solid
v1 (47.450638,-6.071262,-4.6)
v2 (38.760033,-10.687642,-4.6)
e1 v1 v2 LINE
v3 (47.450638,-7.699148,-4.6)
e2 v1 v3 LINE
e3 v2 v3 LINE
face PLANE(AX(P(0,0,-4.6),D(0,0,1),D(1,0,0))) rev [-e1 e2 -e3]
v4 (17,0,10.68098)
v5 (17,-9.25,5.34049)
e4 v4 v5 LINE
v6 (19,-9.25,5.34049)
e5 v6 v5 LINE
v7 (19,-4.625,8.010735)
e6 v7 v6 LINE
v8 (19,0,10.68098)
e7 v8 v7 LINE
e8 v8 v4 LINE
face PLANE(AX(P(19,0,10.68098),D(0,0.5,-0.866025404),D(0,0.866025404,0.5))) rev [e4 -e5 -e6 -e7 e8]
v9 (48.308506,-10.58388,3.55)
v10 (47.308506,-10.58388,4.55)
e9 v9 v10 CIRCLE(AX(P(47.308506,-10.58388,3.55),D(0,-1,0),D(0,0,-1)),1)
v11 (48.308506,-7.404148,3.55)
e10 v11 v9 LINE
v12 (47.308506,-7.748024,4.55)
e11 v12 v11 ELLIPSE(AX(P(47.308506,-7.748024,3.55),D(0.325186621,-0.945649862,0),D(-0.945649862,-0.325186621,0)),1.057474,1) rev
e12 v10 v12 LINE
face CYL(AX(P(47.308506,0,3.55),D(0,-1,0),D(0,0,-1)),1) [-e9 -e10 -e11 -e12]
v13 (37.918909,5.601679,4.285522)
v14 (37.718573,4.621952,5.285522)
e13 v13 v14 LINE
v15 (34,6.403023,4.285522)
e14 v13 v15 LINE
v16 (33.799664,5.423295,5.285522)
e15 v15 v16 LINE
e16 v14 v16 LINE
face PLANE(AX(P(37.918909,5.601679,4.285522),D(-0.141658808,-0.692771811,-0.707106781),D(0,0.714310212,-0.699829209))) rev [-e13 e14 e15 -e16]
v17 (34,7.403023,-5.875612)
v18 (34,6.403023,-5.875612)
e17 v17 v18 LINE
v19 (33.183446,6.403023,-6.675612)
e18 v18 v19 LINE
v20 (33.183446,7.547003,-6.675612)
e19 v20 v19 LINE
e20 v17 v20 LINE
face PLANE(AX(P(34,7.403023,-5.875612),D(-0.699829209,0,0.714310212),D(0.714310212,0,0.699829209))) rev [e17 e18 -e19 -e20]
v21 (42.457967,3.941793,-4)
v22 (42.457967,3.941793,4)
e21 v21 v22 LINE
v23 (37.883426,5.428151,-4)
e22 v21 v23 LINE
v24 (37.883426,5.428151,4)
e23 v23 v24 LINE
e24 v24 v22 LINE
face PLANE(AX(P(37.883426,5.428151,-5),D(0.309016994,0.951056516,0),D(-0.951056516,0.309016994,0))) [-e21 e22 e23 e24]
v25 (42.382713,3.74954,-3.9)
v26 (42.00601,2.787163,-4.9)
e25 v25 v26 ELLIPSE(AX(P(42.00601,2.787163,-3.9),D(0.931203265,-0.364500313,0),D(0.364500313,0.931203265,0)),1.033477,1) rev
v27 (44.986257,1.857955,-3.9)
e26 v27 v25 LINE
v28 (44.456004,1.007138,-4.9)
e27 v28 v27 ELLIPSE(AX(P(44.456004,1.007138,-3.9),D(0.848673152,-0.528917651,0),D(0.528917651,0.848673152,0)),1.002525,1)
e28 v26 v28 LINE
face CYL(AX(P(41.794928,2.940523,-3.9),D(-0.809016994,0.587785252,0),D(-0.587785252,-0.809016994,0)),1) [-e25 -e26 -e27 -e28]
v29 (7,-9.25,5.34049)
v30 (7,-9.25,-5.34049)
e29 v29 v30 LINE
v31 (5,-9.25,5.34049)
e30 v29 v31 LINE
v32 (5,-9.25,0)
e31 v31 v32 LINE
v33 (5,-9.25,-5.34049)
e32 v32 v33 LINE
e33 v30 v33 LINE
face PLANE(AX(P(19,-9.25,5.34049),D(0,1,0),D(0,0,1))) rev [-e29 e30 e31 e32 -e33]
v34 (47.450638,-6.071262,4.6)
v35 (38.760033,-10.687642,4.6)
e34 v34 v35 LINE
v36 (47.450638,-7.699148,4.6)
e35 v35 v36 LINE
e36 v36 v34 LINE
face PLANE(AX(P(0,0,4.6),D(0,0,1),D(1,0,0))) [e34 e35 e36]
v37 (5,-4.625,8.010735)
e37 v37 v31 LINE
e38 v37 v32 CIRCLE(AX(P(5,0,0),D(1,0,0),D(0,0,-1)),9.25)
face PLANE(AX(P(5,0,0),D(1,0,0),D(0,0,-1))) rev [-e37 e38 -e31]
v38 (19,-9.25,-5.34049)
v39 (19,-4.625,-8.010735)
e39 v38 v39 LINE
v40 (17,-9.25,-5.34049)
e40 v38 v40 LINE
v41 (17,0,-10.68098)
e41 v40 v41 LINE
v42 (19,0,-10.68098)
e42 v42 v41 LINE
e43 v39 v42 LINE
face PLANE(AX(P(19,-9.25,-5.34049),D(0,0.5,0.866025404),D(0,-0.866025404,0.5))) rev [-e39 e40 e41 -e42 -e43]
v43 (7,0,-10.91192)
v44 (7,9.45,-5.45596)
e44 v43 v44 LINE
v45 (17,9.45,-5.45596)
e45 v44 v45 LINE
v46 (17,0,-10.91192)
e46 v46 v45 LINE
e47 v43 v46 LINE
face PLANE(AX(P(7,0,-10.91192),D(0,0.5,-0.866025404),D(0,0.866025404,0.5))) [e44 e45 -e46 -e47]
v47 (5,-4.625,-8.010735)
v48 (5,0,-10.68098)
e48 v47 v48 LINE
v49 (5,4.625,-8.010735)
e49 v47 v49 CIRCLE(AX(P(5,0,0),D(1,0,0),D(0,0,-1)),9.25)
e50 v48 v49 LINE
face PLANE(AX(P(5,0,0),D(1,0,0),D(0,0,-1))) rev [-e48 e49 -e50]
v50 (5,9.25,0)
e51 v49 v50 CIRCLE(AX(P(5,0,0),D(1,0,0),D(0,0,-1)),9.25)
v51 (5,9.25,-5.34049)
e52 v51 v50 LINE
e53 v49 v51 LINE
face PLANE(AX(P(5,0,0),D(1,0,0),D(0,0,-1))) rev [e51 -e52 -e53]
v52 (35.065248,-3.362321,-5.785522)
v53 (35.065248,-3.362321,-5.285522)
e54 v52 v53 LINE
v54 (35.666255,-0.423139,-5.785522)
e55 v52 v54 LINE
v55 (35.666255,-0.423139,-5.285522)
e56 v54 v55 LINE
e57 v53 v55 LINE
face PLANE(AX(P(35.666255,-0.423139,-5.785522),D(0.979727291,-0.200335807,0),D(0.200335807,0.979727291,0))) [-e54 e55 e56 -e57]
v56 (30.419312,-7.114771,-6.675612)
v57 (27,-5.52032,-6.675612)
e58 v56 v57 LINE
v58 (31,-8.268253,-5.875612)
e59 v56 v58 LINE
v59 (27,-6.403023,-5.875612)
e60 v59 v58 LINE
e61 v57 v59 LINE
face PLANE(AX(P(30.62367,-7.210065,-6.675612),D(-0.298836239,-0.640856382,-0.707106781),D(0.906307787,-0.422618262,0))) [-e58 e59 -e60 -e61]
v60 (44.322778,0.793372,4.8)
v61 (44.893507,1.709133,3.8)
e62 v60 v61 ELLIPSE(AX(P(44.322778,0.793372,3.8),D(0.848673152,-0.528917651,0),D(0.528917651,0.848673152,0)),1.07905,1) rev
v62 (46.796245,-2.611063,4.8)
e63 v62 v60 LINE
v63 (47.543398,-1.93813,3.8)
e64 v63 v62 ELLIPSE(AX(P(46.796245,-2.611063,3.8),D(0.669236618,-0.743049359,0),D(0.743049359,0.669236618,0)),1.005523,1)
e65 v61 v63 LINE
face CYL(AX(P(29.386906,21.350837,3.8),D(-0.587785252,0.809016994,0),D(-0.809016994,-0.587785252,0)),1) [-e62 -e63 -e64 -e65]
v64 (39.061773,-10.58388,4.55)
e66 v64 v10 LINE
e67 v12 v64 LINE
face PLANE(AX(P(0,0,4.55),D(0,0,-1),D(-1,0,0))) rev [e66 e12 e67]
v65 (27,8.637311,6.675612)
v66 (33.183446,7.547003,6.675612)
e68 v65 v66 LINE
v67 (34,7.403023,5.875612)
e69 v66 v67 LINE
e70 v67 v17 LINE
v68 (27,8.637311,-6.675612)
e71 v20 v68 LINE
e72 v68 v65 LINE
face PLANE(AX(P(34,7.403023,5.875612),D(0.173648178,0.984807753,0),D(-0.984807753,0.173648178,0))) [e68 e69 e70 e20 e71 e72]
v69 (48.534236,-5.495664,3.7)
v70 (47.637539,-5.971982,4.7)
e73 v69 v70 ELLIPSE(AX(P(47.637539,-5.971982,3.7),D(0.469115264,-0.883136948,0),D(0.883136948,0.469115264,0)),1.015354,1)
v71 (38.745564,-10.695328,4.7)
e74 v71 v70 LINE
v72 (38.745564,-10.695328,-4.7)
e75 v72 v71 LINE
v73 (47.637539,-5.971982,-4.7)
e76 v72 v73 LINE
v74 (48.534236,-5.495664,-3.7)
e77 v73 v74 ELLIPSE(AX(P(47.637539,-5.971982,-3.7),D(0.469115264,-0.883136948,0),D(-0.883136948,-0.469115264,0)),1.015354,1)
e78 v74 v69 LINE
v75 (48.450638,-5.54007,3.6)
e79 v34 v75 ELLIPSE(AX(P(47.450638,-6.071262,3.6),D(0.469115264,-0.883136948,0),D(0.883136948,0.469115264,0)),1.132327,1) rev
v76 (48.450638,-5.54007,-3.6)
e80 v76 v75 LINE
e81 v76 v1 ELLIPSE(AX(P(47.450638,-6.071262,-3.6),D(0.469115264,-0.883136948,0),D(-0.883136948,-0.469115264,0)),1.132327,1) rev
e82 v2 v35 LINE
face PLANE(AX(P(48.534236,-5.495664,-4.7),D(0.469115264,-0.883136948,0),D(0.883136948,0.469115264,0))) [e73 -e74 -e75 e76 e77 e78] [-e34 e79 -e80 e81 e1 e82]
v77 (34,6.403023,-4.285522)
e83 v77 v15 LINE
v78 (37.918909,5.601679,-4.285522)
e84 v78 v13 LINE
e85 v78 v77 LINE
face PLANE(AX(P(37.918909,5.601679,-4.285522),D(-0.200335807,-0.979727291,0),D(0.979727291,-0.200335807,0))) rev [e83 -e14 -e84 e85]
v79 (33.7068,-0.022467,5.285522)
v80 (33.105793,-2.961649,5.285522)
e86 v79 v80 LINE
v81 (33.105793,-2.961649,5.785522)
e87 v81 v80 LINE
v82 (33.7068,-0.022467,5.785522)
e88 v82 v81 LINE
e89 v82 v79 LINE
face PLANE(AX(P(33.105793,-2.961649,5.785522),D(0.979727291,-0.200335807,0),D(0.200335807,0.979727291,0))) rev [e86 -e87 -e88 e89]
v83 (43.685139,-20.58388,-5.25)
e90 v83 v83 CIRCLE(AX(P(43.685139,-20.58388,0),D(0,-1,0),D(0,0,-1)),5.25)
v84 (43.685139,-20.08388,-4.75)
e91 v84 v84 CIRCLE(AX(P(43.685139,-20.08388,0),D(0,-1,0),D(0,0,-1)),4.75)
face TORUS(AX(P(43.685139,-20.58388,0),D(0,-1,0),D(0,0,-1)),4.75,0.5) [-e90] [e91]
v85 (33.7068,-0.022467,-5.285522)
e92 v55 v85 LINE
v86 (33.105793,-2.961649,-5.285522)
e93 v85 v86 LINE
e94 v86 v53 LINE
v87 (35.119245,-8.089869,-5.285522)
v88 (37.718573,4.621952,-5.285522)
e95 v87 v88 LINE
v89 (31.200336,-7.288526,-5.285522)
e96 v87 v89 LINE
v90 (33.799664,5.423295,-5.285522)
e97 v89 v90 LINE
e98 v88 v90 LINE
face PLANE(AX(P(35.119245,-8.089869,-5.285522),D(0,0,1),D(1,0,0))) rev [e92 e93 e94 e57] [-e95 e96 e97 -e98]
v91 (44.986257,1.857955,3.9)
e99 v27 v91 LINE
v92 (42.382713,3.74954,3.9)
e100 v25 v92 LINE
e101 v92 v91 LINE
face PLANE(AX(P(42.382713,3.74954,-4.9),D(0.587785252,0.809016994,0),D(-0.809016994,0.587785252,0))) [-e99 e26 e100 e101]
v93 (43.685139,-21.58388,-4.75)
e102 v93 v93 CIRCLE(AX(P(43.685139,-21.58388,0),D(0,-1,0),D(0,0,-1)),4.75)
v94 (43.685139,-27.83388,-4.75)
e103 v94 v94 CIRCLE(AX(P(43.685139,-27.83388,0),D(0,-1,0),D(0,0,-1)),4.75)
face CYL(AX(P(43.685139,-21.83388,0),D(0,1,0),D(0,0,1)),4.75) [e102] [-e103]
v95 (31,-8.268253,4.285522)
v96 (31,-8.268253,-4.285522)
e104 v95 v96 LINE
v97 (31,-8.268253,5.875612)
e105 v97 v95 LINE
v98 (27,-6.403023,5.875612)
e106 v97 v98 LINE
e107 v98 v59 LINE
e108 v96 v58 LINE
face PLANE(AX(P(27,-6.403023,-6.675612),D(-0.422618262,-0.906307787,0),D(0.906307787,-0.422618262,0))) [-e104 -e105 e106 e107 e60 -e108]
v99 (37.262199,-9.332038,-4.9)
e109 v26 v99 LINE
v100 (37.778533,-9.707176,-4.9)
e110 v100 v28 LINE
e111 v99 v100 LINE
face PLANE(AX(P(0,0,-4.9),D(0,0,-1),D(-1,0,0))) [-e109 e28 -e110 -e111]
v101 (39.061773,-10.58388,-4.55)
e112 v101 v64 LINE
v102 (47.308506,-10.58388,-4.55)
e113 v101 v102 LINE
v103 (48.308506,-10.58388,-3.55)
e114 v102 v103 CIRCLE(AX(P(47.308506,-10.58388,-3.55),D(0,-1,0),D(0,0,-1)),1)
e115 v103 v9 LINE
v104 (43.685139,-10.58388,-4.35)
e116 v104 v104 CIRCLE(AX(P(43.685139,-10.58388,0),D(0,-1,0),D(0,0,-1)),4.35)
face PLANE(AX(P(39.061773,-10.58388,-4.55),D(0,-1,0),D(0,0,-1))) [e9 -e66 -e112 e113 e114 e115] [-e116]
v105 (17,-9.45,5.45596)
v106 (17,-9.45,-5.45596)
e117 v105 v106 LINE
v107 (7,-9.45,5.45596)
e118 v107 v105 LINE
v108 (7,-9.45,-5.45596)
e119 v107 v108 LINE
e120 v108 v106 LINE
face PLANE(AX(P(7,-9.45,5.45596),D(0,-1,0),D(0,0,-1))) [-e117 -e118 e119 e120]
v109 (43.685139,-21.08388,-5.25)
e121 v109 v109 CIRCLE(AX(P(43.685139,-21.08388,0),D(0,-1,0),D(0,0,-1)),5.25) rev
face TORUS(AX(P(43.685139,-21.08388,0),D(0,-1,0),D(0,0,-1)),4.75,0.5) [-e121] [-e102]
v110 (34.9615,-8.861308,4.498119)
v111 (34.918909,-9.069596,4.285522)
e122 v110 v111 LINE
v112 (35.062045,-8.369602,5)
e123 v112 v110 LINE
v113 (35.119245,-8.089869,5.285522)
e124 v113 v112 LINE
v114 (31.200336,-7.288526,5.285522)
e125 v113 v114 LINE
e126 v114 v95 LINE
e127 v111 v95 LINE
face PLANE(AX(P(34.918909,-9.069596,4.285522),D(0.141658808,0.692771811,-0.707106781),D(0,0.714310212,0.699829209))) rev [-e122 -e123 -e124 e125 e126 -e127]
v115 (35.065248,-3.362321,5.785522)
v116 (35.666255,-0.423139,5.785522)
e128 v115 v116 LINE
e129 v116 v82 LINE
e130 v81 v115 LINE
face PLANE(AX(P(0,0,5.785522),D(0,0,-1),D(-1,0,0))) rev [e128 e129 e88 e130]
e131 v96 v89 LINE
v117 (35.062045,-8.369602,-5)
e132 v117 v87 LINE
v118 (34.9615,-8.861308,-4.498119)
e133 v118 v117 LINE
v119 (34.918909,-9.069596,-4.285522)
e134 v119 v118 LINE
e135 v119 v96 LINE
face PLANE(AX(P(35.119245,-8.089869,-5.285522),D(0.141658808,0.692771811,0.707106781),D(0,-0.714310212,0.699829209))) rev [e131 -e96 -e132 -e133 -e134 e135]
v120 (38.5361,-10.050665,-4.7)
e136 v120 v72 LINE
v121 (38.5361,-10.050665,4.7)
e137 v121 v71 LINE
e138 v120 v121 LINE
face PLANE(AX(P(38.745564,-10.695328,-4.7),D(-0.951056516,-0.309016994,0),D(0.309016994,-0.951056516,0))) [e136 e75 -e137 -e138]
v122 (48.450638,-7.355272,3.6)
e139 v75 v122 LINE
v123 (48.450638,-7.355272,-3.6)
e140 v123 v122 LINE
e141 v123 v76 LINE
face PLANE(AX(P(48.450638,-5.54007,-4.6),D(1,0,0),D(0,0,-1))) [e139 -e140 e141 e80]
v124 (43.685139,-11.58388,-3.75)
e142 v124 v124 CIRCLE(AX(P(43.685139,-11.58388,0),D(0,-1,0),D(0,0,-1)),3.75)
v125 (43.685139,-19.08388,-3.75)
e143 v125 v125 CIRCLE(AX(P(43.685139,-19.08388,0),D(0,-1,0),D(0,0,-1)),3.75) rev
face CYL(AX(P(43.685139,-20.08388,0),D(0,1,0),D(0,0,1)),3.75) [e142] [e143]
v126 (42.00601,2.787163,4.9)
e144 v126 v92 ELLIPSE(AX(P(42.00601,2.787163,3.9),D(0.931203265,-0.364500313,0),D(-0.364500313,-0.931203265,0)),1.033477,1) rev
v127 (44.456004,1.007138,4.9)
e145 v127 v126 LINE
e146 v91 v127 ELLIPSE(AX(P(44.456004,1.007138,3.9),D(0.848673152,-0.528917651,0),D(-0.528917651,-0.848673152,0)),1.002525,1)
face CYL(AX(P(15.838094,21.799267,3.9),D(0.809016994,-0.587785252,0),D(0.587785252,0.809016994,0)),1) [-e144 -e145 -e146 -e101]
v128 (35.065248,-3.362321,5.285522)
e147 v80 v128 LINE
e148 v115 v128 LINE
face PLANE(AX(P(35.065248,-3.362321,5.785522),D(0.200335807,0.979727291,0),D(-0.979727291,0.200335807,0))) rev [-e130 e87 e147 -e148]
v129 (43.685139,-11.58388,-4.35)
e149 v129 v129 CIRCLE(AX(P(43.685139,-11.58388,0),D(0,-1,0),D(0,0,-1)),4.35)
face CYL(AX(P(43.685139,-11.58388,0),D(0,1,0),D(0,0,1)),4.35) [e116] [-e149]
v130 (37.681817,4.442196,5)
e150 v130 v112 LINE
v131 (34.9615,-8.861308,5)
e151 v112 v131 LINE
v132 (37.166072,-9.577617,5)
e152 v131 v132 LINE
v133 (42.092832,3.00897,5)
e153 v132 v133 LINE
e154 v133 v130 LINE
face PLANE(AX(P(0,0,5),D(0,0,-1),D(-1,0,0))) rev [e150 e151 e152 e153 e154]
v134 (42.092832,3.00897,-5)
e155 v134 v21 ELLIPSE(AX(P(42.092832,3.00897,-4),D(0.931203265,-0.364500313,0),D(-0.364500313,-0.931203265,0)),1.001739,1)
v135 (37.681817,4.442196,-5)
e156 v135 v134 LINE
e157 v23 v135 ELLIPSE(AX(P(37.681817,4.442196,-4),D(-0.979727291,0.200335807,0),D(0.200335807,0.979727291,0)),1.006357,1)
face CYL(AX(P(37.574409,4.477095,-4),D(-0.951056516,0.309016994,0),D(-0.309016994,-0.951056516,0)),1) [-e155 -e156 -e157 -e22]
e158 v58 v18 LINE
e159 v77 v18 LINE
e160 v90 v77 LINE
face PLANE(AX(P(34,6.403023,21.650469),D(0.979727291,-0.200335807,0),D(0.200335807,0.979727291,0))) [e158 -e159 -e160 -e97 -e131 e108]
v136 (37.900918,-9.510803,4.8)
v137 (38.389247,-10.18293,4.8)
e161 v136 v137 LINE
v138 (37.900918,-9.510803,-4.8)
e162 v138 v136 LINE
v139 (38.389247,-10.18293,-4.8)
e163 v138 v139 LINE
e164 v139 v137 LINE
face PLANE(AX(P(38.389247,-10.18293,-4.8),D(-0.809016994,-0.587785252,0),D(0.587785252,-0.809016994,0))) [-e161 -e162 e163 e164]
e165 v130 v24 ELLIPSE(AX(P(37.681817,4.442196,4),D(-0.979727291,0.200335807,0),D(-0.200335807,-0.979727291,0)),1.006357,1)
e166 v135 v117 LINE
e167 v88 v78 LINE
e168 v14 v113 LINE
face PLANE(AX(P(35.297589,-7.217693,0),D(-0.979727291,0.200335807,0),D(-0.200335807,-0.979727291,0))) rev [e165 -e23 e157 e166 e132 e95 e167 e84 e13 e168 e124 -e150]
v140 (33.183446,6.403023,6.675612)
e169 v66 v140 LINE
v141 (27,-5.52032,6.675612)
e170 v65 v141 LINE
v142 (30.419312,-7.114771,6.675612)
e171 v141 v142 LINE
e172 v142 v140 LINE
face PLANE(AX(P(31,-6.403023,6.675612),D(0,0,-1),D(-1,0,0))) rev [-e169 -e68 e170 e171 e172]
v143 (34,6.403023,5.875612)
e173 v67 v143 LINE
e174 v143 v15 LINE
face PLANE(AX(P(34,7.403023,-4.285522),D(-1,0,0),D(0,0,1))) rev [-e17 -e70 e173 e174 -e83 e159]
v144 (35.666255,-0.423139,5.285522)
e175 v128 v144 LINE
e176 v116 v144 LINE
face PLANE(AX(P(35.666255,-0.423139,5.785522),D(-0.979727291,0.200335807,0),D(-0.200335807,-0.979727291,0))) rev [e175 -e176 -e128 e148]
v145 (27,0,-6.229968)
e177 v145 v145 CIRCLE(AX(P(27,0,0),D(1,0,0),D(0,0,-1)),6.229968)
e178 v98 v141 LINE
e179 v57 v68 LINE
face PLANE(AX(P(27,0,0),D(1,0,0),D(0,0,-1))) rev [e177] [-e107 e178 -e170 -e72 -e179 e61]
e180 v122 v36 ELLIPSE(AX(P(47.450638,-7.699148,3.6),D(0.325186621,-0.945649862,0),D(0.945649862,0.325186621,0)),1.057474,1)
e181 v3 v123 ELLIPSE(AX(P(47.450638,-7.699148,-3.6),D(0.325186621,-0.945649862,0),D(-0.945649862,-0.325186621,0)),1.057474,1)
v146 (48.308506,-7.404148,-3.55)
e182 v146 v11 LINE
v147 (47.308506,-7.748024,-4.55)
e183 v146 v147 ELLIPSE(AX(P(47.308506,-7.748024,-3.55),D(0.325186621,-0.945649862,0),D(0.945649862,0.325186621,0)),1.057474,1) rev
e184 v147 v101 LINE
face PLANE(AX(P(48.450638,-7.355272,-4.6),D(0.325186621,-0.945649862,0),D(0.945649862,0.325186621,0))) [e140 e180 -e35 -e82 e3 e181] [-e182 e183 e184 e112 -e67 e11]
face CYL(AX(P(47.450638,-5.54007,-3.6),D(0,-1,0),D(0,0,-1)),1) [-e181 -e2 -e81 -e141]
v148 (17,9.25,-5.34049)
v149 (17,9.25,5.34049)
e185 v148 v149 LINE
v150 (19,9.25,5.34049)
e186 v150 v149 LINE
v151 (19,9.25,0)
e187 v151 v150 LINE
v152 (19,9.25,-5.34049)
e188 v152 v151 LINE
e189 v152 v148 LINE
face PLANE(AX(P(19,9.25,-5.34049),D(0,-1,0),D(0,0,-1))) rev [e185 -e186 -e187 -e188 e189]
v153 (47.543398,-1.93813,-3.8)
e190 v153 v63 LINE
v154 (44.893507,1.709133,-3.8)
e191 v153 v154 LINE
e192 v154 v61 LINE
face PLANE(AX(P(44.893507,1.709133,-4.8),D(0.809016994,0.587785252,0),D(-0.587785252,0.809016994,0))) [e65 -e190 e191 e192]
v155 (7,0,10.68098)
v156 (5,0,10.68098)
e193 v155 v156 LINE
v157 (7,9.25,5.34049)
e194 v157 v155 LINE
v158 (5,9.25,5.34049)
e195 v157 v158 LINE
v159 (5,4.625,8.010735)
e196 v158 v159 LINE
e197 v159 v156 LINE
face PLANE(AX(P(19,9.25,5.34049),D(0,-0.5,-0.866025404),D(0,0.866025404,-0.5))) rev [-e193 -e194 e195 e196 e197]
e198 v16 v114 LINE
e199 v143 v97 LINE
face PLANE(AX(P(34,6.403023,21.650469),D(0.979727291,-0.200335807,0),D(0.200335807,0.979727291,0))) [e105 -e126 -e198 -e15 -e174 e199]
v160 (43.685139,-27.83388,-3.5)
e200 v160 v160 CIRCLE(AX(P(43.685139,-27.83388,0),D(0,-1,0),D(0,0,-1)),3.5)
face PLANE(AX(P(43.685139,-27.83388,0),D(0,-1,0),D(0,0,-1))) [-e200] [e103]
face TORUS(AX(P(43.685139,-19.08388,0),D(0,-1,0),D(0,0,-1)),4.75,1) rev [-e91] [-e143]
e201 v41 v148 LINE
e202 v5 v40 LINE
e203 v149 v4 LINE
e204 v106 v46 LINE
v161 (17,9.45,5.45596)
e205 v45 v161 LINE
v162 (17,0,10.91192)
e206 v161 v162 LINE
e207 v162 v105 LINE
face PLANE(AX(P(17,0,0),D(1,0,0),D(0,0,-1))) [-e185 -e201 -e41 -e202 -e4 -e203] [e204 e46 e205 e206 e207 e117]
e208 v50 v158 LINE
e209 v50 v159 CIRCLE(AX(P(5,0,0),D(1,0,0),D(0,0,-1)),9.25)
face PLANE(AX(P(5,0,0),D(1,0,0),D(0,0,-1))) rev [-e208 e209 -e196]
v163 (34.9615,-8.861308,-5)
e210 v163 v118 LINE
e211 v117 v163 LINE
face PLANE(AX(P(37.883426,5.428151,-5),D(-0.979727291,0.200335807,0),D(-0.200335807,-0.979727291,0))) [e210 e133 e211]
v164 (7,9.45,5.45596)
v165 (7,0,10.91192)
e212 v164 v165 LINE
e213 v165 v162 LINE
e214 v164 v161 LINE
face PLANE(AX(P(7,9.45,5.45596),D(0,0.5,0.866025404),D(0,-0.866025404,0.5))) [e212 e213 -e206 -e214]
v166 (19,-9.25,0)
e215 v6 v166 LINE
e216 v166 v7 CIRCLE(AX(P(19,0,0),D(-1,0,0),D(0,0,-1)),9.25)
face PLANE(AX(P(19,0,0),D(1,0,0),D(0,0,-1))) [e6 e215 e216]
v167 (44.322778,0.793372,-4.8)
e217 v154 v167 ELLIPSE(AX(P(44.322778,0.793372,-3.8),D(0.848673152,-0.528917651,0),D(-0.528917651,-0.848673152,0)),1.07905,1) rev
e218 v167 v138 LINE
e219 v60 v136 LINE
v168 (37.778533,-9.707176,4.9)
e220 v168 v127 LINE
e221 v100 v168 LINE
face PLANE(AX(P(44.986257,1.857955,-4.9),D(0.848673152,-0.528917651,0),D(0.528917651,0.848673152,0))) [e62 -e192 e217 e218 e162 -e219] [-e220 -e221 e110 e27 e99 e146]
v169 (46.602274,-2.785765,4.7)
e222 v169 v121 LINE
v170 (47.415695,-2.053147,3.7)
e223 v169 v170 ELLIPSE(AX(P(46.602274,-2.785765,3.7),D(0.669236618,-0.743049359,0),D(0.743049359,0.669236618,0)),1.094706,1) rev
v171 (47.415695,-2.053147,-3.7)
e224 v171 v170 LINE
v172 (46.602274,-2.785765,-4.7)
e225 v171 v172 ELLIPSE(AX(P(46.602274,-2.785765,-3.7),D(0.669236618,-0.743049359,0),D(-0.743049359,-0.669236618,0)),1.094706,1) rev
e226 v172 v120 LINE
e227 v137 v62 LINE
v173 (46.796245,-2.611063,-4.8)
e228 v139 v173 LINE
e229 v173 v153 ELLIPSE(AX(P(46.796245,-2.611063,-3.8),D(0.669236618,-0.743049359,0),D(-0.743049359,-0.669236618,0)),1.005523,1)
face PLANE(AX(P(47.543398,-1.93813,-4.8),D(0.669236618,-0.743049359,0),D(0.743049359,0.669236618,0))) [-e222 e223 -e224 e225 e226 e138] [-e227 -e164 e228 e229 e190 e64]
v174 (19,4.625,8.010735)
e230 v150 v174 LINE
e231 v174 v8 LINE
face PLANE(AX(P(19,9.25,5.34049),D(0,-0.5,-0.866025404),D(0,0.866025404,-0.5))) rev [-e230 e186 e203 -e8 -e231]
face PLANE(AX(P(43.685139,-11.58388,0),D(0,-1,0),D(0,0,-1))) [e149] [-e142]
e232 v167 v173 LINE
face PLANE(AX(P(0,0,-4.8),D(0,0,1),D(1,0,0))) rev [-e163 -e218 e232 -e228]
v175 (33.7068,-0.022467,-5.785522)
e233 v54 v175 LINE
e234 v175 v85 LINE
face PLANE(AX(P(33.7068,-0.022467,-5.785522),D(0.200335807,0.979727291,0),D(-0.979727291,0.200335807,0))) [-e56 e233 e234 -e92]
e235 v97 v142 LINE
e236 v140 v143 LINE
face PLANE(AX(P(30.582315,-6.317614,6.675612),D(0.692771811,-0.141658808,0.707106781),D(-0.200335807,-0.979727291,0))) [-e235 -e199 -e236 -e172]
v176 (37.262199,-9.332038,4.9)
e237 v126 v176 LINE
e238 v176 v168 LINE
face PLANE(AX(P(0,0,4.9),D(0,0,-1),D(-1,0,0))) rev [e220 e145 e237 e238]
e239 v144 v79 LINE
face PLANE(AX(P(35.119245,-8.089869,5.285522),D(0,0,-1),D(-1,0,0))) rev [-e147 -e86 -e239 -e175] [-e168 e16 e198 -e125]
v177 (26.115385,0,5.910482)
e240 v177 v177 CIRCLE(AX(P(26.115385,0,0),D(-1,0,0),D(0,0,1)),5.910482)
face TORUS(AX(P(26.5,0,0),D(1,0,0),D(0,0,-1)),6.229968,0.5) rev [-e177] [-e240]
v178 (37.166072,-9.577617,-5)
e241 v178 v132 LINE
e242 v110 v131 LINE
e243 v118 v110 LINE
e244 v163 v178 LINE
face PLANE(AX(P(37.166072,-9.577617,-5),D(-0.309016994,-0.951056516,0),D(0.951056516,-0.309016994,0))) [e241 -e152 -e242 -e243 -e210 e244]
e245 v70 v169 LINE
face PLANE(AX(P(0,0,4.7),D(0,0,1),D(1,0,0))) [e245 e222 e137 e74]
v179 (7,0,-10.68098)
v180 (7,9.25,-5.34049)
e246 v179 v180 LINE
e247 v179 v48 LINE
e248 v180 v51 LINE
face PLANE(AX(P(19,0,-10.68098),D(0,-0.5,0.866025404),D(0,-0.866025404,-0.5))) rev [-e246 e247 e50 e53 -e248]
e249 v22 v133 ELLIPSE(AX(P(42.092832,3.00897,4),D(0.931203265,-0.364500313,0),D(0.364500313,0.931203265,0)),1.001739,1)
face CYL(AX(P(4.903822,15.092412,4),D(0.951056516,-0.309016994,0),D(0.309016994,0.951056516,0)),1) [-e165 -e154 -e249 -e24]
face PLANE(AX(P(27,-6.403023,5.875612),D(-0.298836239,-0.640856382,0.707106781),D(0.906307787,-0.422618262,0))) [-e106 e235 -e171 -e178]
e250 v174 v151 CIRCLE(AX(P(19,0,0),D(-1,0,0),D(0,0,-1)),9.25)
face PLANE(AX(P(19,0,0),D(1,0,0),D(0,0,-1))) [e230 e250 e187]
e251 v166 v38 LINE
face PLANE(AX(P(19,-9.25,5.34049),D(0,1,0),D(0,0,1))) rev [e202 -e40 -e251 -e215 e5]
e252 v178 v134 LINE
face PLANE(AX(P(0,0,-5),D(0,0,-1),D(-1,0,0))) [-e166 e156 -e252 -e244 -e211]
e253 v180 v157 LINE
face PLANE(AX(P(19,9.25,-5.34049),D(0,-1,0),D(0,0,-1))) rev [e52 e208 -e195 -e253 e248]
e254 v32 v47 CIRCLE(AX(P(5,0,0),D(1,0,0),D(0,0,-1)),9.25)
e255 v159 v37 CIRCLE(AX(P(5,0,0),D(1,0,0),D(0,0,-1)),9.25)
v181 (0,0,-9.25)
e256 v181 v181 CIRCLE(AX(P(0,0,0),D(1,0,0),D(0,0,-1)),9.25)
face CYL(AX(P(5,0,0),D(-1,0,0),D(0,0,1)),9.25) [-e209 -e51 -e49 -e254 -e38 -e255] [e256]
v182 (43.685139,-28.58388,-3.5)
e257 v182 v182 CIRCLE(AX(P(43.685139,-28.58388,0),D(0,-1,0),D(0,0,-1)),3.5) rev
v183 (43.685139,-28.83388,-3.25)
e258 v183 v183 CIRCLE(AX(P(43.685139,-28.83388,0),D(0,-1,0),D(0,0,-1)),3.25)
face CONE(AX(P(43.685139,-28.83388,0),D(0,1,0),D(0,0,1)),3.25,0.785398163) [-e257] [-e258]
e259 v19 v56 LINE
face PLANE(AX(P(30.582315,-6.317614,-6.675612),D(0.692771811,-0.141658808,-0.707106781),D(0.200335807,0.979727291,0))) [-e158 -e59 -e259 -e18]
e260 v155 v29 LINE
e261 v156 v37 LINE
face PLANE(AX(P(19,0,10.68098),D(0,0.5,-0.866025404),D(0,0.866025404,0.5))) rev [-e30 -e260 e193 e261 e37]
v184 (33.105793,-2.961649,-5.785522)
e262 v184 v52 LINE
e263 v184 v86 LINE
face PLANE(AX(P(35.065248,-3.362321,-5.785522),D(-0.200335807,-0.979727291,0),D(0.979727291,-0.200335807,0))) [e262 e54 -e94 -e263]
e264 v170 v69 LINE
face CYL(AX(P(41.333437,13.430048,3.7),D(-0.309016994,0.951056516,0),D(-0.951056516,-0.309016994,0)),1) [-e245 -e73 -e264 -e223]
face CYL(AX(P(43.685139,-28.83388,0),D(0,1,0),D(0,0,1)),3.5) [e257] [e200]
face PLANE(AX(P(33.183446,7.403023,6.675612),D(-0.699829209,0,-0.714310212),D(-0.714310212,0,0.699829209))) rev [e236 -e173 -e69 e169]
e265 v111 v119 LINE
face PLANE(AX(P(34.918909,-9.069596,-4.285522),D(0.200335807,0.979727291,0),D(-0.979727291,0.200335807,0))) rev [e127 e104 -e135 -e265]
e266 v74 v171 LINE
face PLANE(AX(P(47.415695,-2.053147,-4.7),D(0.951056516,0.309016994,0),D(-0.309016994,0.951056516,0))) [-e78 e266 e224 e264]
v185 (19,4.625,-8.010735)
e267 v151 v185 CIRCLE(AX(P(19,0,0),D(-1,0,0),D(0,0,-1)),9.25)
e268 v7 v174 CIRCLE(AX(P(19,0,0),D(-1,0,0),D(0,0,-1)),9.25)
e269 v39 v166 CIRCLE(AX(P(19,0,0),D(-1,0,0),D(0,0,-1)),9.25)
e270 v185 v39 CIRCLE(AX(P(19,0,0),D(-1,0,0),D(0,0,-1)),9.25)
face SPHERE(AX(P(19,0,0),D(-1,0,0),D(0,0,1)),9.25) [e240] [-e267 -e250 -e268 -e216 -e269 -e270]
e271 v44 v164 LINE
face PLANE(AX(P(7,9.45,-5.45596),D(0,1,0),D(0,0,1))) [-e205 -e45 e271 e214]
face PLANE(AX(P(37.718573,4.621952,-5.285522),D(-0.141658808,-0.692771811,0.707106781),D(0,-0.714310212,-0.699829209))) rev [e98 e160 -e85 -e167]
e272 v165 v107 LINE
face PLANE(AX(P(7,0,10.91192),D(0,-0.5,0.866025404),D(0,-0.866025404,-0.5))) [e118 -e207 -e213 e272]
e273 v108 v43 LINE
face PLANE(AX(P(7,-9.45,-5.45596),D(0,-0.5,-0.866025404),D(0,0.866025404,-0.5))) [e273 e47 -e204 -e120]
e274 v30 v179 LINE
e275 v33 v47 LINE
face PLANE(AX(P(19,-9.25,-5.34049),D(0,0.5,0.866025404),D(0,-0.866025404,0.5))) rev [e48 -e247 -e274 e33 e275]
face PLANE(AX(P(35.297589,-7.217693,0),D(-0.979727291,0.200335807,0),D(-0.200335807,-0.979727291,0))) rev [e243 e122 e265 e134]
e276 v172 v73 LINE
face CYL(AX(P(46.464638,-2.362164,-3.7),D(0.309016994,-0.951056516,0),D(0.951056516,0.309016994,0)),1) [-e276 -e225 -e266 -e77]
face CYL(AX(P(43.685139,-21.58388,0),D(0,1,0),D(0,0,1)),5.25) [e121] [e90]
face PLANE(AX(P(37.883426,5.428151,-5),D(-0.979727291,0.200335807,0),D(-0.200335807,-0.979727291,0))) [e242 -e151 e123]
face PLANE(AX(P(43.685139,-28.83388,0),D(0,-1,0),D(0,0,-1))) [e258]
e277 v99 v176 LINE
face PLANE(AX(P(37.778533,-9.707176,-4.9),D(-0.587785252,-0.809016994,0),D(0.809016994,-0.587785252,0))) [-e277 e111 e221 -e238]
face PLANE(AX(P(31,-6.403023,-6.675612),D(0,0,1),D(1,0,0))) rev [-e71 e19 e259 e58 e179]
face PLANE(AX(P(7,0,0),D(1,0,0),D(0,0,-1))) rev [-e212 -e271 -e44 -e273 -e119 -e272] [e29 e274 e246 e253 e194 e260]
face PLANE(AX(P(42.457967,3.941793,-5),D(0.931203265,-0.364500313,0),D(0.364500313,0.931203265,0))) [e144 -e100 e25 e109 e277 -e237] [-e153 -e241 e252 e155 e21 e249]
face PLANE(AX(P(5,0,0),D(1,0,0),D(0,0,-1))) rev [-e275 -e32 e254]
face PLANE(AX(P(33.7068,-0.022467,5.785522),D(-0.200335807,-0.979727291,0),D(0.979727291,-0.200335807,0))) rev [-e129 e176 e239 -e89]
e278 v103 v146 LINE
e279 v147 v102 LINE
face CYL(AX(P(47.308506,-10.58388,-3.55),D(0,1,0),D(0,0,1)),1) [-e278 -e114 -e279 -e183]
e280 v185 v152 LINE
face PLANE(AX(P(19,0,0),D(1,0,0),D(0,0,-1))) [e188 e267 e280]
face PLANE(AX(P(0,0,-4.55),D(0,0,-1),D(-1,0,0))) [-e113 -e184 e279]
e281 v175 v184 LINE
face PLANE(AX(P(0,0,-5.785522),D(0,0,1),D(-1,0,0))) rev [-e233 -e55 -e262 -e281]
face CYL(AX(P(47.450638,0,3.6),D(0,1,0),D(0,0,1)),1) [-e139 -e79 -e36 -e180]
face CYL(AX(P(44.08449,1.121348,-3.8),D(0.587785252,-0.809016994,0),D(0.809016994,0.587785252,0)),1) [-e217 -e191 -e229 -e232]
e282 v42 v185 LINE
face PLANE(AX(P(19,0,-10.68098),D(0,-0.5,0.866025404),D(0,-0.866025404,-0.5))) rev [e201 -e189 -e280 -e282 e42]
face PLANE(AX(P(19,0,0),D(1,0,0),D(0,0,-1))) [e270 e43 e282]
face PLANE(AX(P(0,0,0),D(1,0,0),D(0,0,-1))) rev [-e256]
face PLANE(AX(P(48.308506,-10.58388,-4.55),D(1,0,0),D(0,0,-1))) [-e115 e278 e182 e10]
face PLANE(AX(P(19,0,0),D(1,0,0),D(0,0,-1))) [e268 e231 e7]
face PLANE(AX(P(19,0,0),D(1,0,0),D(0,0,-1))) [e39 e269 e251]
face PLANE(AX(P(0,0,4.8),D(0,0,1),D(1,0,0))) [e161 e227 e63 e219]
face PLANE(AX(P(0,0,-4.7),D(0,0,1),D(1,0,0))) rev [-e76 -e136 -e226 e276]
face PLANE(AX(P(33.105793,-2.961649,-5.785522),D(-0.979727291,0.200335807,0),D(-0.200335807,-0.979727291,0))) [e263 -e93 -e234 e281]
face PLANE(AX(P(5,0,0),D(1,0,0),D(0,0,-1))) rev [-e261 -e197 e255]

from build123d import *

# Parameters (mm, degrees)
SKETCH1_R                 = 9.25
BOSS_EXTRUDE1_DEPTH       = 5
BOSS_EXTRUDE2_DEPTH       = 14
BOSS_EXTRUDE3_DEPTH       = 5
BOSS_EXTRUDE3_DEPTH_BACK  = 5
BOSS_EXTRUDE3_START       = -7
REVOLVE1_ANGLE            = 180
BOSS_EXTRUDE4_START       = 8
SKETCH6_W                 = 13.351224976
SKETCH6_H                 = 12.806045122
BOSS_EXTRUDE4_DEPTH       = 4
DRAFT4_ANGLE              = 25
BOSS_EXTRUDE5_DEPTH       = 13.351224975
BOSS_EXTRUDE6_DEPTH       = 4
CHAMFER1_SIZE             = 0.8
BOSS_EXTRUDE7_DEPTH       = 0.5
BOSS_EXTRUDE8_DEPTH       = 5
BOSS_EXTRUDE8_DEPTH_BACK  = 5
BOSS_EXTRUDE9_DEPTH       = 4.9
BOSS_EXTRUDE9_DEPTH_BACK  = 4.9
BOSS_EXTRUDE10_DEPTH      = 4.8
BOSS_EXTRUDE10_DEPTH_BACK = 4.8
BOSS_EXTRUDE11_DEPTH      = 4.7
BOSS_EXTRUDE11_DEPTH_BACK = 4.7
BOSS_EXTRUDE12_DEPTH      = 4.6
BOSS_EXTRUDE12_DEPTH_BACK = 4.6
BOSS_EXTRUDE13_DEPTH      = 4.55
BOSS_EXTRUDE13_DEPTH_BACK = 4.55
FILLET1_R                 = 1
SKETCH16_R                = 4.35
BOSS_EXTRUDE14_DEPTH      = 1
SKETCH17_R                = 3.75
BOSS_EXTRUDE15_DEPTH      = 8.5
SKETCH18_R                = 5.25
BOSS_EXTRUDE16_DEPTH      = 1.5
SKETCH19_R                = 4.75
BOSS_EXTRUDE17_DEPTH      = 0.25
SKETCH21_R                = 4.75
BOSS_EXTRUDE18_DEPTH      = 6
SKETCH22_R                = 3.5
BOSS_EXTRUDE19_DEPTH      = 1
CHAMFER3_SIZE             = 0.25
FILLET2_R                 = 1
BOSS_EXTRUDE20_DEPTH      = 1
DRAFT8_ANGLE              = 10
FILLET3_R                 = 0.5
FILLET4_R                 = 0.5


# Some blends are built 0.0001 mm under size
with BuildPart() as part:
    # Sketch1 → Boss-Extrude1 (new body)
    with BuildSketch(Plane(origin=(0, 0, 0), x_dir=(0, 0, -1), z_dir=(1, 0, 0))):
        Circle(SKETCH1_R)
    extrude(amount=BOSS_EXTRUDE1_DEPTH)

    # Sketch2 → Boss-Extrude2 (add)
    with BuildSketch(Plane(origin=(5, 0, 0), x_dir=(0, 0, -1), z_dir=(1, 0, 0))):
        Polygon((5.34048999, -9.25), (10.68097998, 0), (5.34048999, 9.25), (-5.34048999, 9.25), (-10.68097998, 0), (-5.34048999, -9.25), align=None)
    extrude(amount=BOSS_EXTRUDE2_DEPTH)

    # Sketch3 → Boss-Extrude3 (add, two sides: drawn at the far end of the back side and taken through both)
    with BuildSketch(Plane(origin=(19, 0, 0), x_dir=(0, 0, -1), z_dir=(1, 0, 0)).offset(BOSS_EXTRUDE3_START - BOSS_EXTRUDE3_DEPTH_BACK)):
        Polygon((-5.455960044, -9.45), (5.455960044, -9.45), (10.911920088, 0), (5.455960044, 9.45), (-5.455960044, 9.45), (-10.911920088, 0), align=None)
    extrude(amount=BOSS_EXTRUDE3_DEPTH + BOSS_EXTRUDE3_DEPTH_BACK)

    # Sketch5 → Revolve1 (revolve)
    with BuildSketch(Plane(origin=(19, 0, 0), x_dir=(0, 0, -1), z_dir=(1, 0, 0))):
        with BuildLine():
            Line((0, 9.25), (0, -9.25))
            ThreePointArc((0, -9.25), (9.25, 0), (0, 9.25))
        make_face()
    revolve(axis=Axis((19, 9.25, 0), (0, -1, 0)), revolution_arc=REVOLVE1_ANGLE)

    # Sketch6 → Boss-Extrude4 (add)
    with BuildSketch(Plane(origin=(19, 0, 0), x_dir=(0, 0, -1), z_dir=(1, 0, 0)).offset(BOSS_EXTRUDE4_START)):
        Rectangle(SKETCH6_W, SKETCH6_H)
    extrude(amount=BOSS_EXTRUDE4_DEPTH)

    # Draft4
    draft4_faces = [part.faces().sort_by_distance(p)[0] for p in [
        (29, -6.403022561, 0),
    ]]
    draft(draft4_faces, Plane(origin=(27, 0, 0), x_dir=(0, 0, -1), z_dir=(-1, 0, 0)), DRAFT4_ANGLE)

    # Sketch7 → Boss-Extrude5 (add)
    with BuildSketch(Plane(origin=(0, 0, -6.675612488), x_dir=(-1, 0, 0), z_dir=(0, 0, -1))):
        Polygon((-31, 6.403022561), (-34, 6.403022561), (-31, -8.268253194), align=None)
    extrude(amount=-BOSS_EXTRUDE5_DEPTH)

    # Sketch8 → Boss-Extrude6 (add)
    with BuildSketch(Plane(origin=(31.378679406, -6.416349866, 0), x_dir=(0, 0, -1), z_dir=(0.979727290788127, -0.20033580729604167, 0))):
        Polygon((-4.28552155, 13.084633395), (-5.28552155, 12.084633395), (-5.28552155, -0.890223275), (-4.28552155, -1.890223275), (4.28552155, -1.890223275), (5.28552155, -0.890223275), (5.28552155, 12.084633395), (4.28552155, 13.084633395), align=None)
    extrude(amount=BOSS_EXTRUDE6_DEPTH)

    # Chamfer1
    chamfer1_edges = [part.edges().sort_by_distance(p)[0] for p in [
        (29, -7.335637877, 6.675612488),
        (32.5, -0.932615316, 6.675612487),
        (29, -7.335637877, -6.675612488),
        (32.5, -0.932615316, -6.675612488),
    ]]
    chamfer(chamfer1_edges, length=CHAMFER1_SIZE)

    # Sketch9 → Boss-Extrude7 (add)
    with BuildSketch(Plane.XY.offset(5.28552155)):
        Polygon((33.706800343, -0.022467337), (35.666254924, -0.423138952), (35.065247502, -3.362320824), (33.105792921, -2.961649209), align=None)
    boss_extrude7 = extrude(amount=BOSS_EXTRUDE7_DEPTH)

    # Mirror1: Boss-Extrude7 across plane
    add(boss_extrude7.mirror(Plane.XY))

    # Sketch10 → Boss-Extrude8 (add, two sides: drawn at the far end of the back side and taken through both)
    with BuildSketch(Plane.XY.offset(-BOSS_EXTRUDE8_DEPTH_BACK)):
        Polygon((37.883425978, 5.428151467), (42.457966503, 3.941793149), (37.166072101, -9.577617309), (34.961500136, -8.861308455), align=None)
    extrude(amount=BOSS_EXTRUDE8_DEPTH + BOSS_EXTRUDE8_DEPTH_BACK)

    # Sketch11 → Boss-Extrude9 (add, two sides: drawn at the far end of the back side and taken through both)
    with BuildSketch(Plane.XY.offset(-BOSS_EXTRUDE9_DEPTH_BACK)):
        Polygon((42.382713023, 3.749540128), (44.986256885, 1.857954789), (37.77853279, -9.707176208), (37.26219912, -9.332037838), align=None)
    extrude(amount=BOSS_EXTRUDE9_DEPTH + BOSS_EXTRUDE9_DEPTH_BACK)

    # Sketch12 → Boss-Extrude10 (add, two sides: drawn at the far end of the back side and taken through both)
    with BuildSketch(Plane.XY.offset(-BOSS_EXTRUDE10_DEPTH_BACK)):
        Polygon((37.900918056, -9.510803316), (44.893506769, 1.709132881), (47.543398175, -1.938129742), (38.389246582, -10.18292987), align=None)
    extrude(amount=BOSS_EXTRUDE10_DEPTH + BOSS_EXTRUDE10_DEPTH_BACK)

    # Sketch13 → Boss-Extrude11 (add, two sides: drawn at the far end of the back side and taken through both)
    with BuildSketch(Plane.XY.offset(-BOSS_EXTRUDE11_DEPTH_BACK)):
        Polygon((38.536099953, -10.050664561), (47.41569472, -2.053147442), (48.534236, -5.495663527), (38.745563718, -10.695327743), align=None)
    extrude(amount=BOSS_EXTRUDE11_DEPTH + BOSS_EXTRUDE11_DEPTH_BACK)

    # Sketch14 → Boss-Extrude12 (add, two sides: drawn at the far end of the back side and taken through both)
    with BuildSketch(Plane.XY.offset(-BOSS_EXTRUDE12_DEPTH_BACK)):
        Polygon((38.760033243, -10.687641647), (48.450638231, -5.540069991), (48.450638231, -7.355271794), align=None)
    extrude(amount=BOSS_EXTRUDE12_DEPTH + BOSS_EXTRUDE12_DEPTH_BACK)

    # Sketch15 → Boss-Extrude13 (add, two sides: drawn at the far end of the back side and taken through both)
    with BuildSketch(Plane.XY.offset(-BOSS_EXTRUDE13_DEPTH_BACK)):
        Polygon((48.308505546, -7.404147863), (39.061773044, -10.583880466), (48.308505546, -10.583880466), align=None)
    extrude(amount=BOSS_EXTRUDE13_DEPTH + BOSS_EXTRUDE13_DEPTH_BACK)

    # Fillet1
    # the kernel refuses this fillet: 1 mm, written as the material it takes off along each edge
    with BuildSketch(Plane(origin=(35.505784687, 6.200693953, -5), x_dir=(0, 0, 1), z_dir=(0.9510565162951532, -0.30901699437494873, 0))) as fillet1_piece_1_section:
        with BuildLine():
            CenterArc((FILLET1_R, FILLET1_R), FILLET1_R, 180, 90)
            Line((0, FILLET1_R), (-FILLET1_R * 0.02, FILLET1_R))
            Line((-FILLET1_R * 0.02, FILLET1_R), (-FILLET1_R * 0.02, -FILLET1_R * 0.02))
            Line((-FILLET1_R * 0.02, -FILLET1_R * 0.02), (FILLET1_R, -FILLET1_R * 0.02))
            Line((FILLET1_R, -FILLET1_R * 0.02), (FILLET1_R, 0))
        make_face()
    fillet1_piece_1 = extrude(amount=9.809956556, mode=Mode.PRIVATE)
    fillet1_piece_1 = split(fillet1_piece_1, bisect_by=Plane(origin=(37.784485844, 4.944292138, -4.77261539), z_dir=(0.9797272907881263, -0.20033580729604558, 0)), keep=Keep.TOP, mode=Mode.PRIVATE)
    fillet1_piece_1 = split(fillet1_piece_1, bisect_by=Plane(origin=(42.324693183, 3.601314564, -4.77261539), z_dir=(-0.9312032654638281, 0.36450031329136506, 0)), keep=Keep.TOP, mode=Mode.PRIVATE)
    add(fillet1_piece_1, mode=Mode.SUBTRACT)
    with BuildSketch(Plane(origin=(35.505784687, 6.200693953, 5), x_dir=(0, 0, -1), z_dir=(0.9510565162951532, -0.30901699437494873, 0))) as fillet1_piece_2_section:
        with BuildLine():
            CenterArc((FILLET1_R, -FILLET1_R), FILLET1_R, 90, 90)
            Line((0, -FILLET1_R), (-FILLET1_R * 0.02, -FILLET1_R))
            Line((-FILLET1_R * 0.02, -FILLET1_R), (-FILLET1_R * 0.02, FILLET1_R * 0.02))
            Line((-FILLET1_R * 0.02, FILLET1_R * 0.02), (FILLET1_R, FILLET1_R * 0.02))
            Line((FILLET1_R, FILLET1_R * 0.02), (FILLET1_R, 0))
        make_face()
    fillet1_piece_2 = extrude(amount=9.809956556, mode=Mode.PRIVATE)
    fillet1_piece_2 = split(fillet1_piece_2, bisect_by=Plane(origin=(37.784485844, 4.944292138, 4.77261539), z_dir=(0.9797272907881263, -0.20033580729604558, 0)), keep=Keep.TOP, mode=Mode.PRIVATE)
    fillet1_piece_2 = split(fillet1_piece_2, bisect_by=Plane(origin=(42.324693183, 3.601314564, 4.77261539), z_dir=(-0.9312032654638281, 0.36450031329136506, 0)), keep=Keep.TOP, mode=Mode.PRIVATE)
    add(fillet1_piece_2, mode=Mode.SUBTRACT)
    with BuildSketch(Plane(origin=(40.360170537, 5.219003259, -4.9), x_dir=(0, 0, 1), z_dir=(0.8090169943749466, -0.5877852522924746, 0))) as fillet1_piece_3_section:
        with BuildLine():
            CenterArc((FILLET1_R, FILLET1_R), FILLET1_R, 180, 90)
            Line((0, FILLET1_R), (-FILLET1_R * 0.02, FILLET1_R))
            Line((-FILLET1_R * 0.02, FILLET1_R), (-FILLET1_R * 0.02, -FILLET1_R * 0.02))
            Line((-FILLET1_R * 0.02, -FILLET1_R * 0.02), (FILLET1_R, -FILLET1_R * 0.02))
            Line((FILLET1_R, -FILLET1_R * 0.02), (FILLET1_R, 0))
        make_face()
    fillet1_piece_3 = extrude(amount=8.218157196, mode=Mode.PRIVATE)
    fillet1_piece_3 = split(fillet1_piece_3, bisect_by=Plane(origin=(42.152358132, 3.16104344, -4.671963642), z_dir=(0.9312032654638281, -0.36450031329136506, 0)), keep=Keep.TOP, mode=Mode.PRIVATE)
    fillet1_piece_3 = split(fillet1_piece_3, bisect_by=Plane(origin=(44.927257038, 1.76328677, -4.671963642), z_dir=(-0.8486731515694315, 0.5289176512513161, 0)), keep=Keep.TOP, mode=Mode.PRIVATE)
    add(fillet1_piece_3, mode=Mode.SUBTRACT)
    with BuildSketch(Plane(origin=(40.360170537, 5.219003259, 4.9), x_dir=(0, 0, -1), z_dir=(0.8090169943749466, -0.5877852522924746, 0))) as fillet1_piece_4_section:
        with BuildLine():
            CenterArc((FILLET1_R, -FILLET1_R), FILLET1_R, 90, 90)
            Line((0, -FILLET1_R), (-FILLET1_R * 0.02, -FILLET1_R))
            Line((-FILLET1_R * 0.02, -FILLET1_R), (-FILLET1_R * 0.02, FILLET1_R * 0.02))
            Line((-FILLET1_R * 0.02, FILLET1_R * 0.02), (FILLET1_R, FILLET1_R * 0.02))
            Line((FILLET1_R, FILLET1_R * 0.02), (FILLET1_R, 0))
        make_face()
    fillet1_piece_4 = extrude(amount=8.218157196, mode=Mode.PRIVATE)
    fillet1_piece_4 = split(fillet1_piece_4, bisect_by=Plane(origin=(42.152358132, 3.16104344, 4.671963642), z_dir=(0.9312032654638281, -0.36450031329136506, 0)), keep=Keep.TOP, mode=Mode.PRIVATE)
    fillet1_piece_4 = split(fillet1_piece_4, bisect_by=Plane(origin=(44.927257038, 1.76328677, 4.671963642), z_dir=(-0.8486731515694315, 0.5289176512513161, 0)), keep=Keep.TOP, mode=Mode.PRIVATE)
    add(fillet1_piece_4, mode=Mode.SUBTRACT)
    with BuildSketch(Plane(origin=(43.424043638, 3.731675367, -4.8), x_dir=(-0.8090169943749492, -0.5877852522924707, 0), z_dir=(0.5877852522924708, -0.8090169943749492, 0))) as fillet1_piece_5_section:
        with BuildLine():
            CenterArc((FILLET1_R, -FILLET1_R), FILLET1_R, 90, 90)
            Line((0, -FILLET1_R), (-FILLET1_R * 0.02, -FILLET1_R))
            Line((-FILLET1_R * 0.02, -FILLET1_R), (-FILLET1_R * 0.02, FILLET1_R * 0.02))
            Line((-FILLET1_R * 0.02, FILLET1_R * 0.02), (FILLET1_R, FILLET1_R * 0.02))
            Line((FILLET1_R, FILLET1_R * 0.02), (FILLET1_R, 0))
        make_face()
    fillet1_piece_5 = extrude(amount=9.508264534, mode=Mode.PRIVATE)
    fillet1_piece_5 = split(fillet1_piece_5, bisect_by=Plane(origin=(44.324817905, 0.796644956, -4.571748894), z_dir=(0.8486731515694315, -0.5289176512513161, 0)), keep=Keep.TOP, mode=Mode.PRIVATE)
    fillet1_piece_5 = split(fillet1_piece_5, bisect_by=Plane(origin=(47.549303394, -1.932811133, -4.571748894), z_dir=(-0.6692366176212915, 0.743049358814617, 0)), keep=Keep.TOP, mode=Mode.PRIVATE)
    add(fillet1_piece_5, mode=Mode.SUBTRACT)
    with BuildSketch(Plane(origin=(43.424043638, 3.731675367, 4.8), x_dir=(0, 0, -1), z_dir=(0.5877852522924708, -0.8090169943749492, 0))) as fillet1_piece_6_section:
        with BuildLine():
            CenterArc((FILLET1_R, -FILLET1_R), FILLET1_R, 90, 90)
            Line((0, -FILLET1_R), (-FILLET1_R * 0.02, -FILLET1_R))
            Line((-FILLET1_R * 0.02, -FILLET1_R), (-FILLET1_R * 0.02, FILLET1_R * 0.02))
            Line((-FILLET1_R * 0.02, FILLET1_R * 0.02), (FILLET1_R, FILLET1_R * 0.02))
            Line((FILLET1_R, FILLET1_R * 0.02), (FILLET1_R, 0))
        make_face()
    fillet1_piece_6 = extrude(amount=9.508264534, mode=Mode.PRIVATE)
    fillet1_piece_6 = split(fillet1_piece_6, bisect_by=Plane(origin=(44.324817905, 0.796644956, 4.571748894), z_dir=(0.8486731515694315, -0.5289176512513161, 0)), keep=Keep.TOP, mode=Mode.PRIVATE)
    fillet1_piece_6 = split(fillet1_piece_6, bisect_by=Plane(origin=(47.549303394, -1.932811133, 4.571748894), z_dir=(-0.6692366176212915, 0.743049358814617, 0)), keep=Keep.TOP, mode=Mode.PRIVATE)
    add(fillet1_piece_6, mode=Mode.SUBTRACT)
    with BuildSketch(Plane(origin=(46.643152234, 0.324493849, -4.7), x_dir=(-0.9510565162951539, -0.3090169943749468, 0), z_dir=(0.3090169943749468, -0.9510565162951538, 0))) as fillet1_piece_7_section:
        with BuildLine():
            CenterArc((FILLET1_R, -FILLET1_R), FILLET1_R, 90, 90)
            Line((0, -FILLET1_R), (-FILLET1_R * 0.02, -FILLET1_R))
            Line((-FILLET1_R * 0.02, -FILLET1_R), (-FILLET1_R * 0.02, FILLET1_R * 0.02))
            Line((-FILLET1_R * 0.02, FILLET1_R * 0.02), (FILLET1_R, FILLET1_R * 0.02))
            Line((FILLET1_R, FILLET1_R * 0.02), (FILLET1_R, 0))
        make_face()
    fillet1_piece_7 = extrude(amount=8.61967562, mode=Mode.PRIVATE)
    fillet1_piece_7 = split(fillet1_piece_7, bisect_by=Plane(origin=(46.696328069, -2.701053935, -4.471525659), z_dir=(0.6692366176212915, -0.743049358814617, 0)), keep=Keep.TOP, mode=Mode.PRIVATE)
    fillet1_piece_7 = split(fillet1_piece_7, bisect_by=Plane(origin=(48.606702009, -5.457170164, -4.471525659), z_dir=(-0.4691152643707939, 0.8831369478933152, 0)), keep=Keep.TOP, mode=Mode.PRIVATE)
    add(fillet1_piece_7, mode=Mode.SUBTRACT)
    with BuildSketch(Plane(origin=(46.643152234, 0.324493849, 4.7), x_dir=(0, 0, -1), z_dir=(0.3090169943749468, -0.9510565162951538, 0))) as fillet1_piece_8_section:
        with BuildLine():
            CenterArc((FILLET1_R, -FILLET1_R), FILLET1_R, 90, 90)
            Line((0, -FILLET1_R), (-FILLET1_R * 0.02, -FILLET1_R))
            Line((-FILLET1_R * 0.02, -FILLET1_R), (-FILLET1_R * 0.02, FILLET1_R * 0.02))
            Line((-FILLET1_R * 0.02, FILLET1_R * 0.02), (FILLET1_R, FILLET1_R * 0.02))
            Line((FILLET1_R, FILLET1_R * 0.02), (FILLET1_R, 0))
        make_face()
    fillet1_piece_8 = extrude(amount=8.61967562, mode=Mode.PRIVATE)
    fillet1_piece_8 = split(fillet1_piece_8, bisect_by=Plane(origin=(46.696328069, -2.701053935, 4.471525659), z_dir=(0.6692366176212915, -0.743049358814617, 0)), keep=Keep.TOP, mode=Mode.PRIVATE)
    fillet1_piece_8 = split(fillet1_piece_8, bisect_by=Plane(origin=(48.606702009, -5.457170164, 4.471525659), z_dir=(-0.4691152643707939, 0.8831369478933152, 0)), keep=Keep.TOP, mode=Mode.PRIVATE)
    add(fillet1_piece_8, mode=Mode.SUBTRACT)
    with BuildSketch(Plane(origin=(48.450638231, -3.040069991, -4.6), x_dir=(-1, 0, 0), z_dir=(0, -1, 0))) as fillet1_piece_9_section:
        with BuildLine():
            CenterArc((FILLET1_R, -FILLET1_R), FILLET1_R, 90, 90)
            Line((0, -FILLET1_R), (-FILLET1_R * 0.02, -FILLET1_R))
            Line((-FILLET1_R * 0.02, -FILLET1_R), (-FILLET1_R * 0.02, FILLET1_R * 0.02))
            Line((-FILLET1_R * 0.02, FILLET1_R * 0.02), (FILLET1_R, FILLET1_R * 0.02))
            Line((FILLET1_R, FILLET1_R * 0.02), (FILLET1_R, 0))
        make_face()
    fillet1_piece_9 = extrude(amount=6.815201803, mode=Mode.PRIVATE)
    fillet1_piece_9 = split(fillet1_piece_9, bisect_by=Plane(origin=(47.861735161, -5.85289058, -4.370703776), z_dir=(0.4691152643707939, -0.8831369478933152, 0)), keep=Keep.TOP, mode=Mode.PRIVATE)
    fillet1_piece_9 = split(fillet1_piece_9, bisect_by=Plane(origin=(48.501873721, -7.337653121, -4.370703776), z_dir=(-0.3251866210132924, 0.9456498620070525, 0)), keep=Keep.TOP, mode=Mode.PRIVATE)
    add(fillet1_piece_9, mode=Mode.SUBTRACT)
    with BuildSketch(Plane(origin=(48.450638231, -3.040069991, 4.6), x_dir=(0, 0, -1), z_dir=(0, -1, 0))) as fillet1_piece_10_section:
        with BuildLine():
            CenterArc((FILLET1_R, -FILLET1_R), FILLET1_R, 90, 90)
            Line((0, -FILLET1_R), (-FILLET1_R * 0.02, -FILLET1_R))
            Line((-FILLET1_R * 0.02, -FILLET1_R), (-FILLET1_R * 0.02, FILLET1_R * 0.02))
            Line((-FILLET1_R * 0.02, FILLET1_R * 0.02), (FILLET1_R, FILLET1_R * 0.02))
            Line((FILLET1_R, FILLET1_R * 0.02), (FILLET1_R, 0))
        make_face()
    fillet1_piece_10 = extrude(amount=6.815201803, mode=Mode.PRIVATE)
    fillet1_piece_10 = split(fillet1_piece_10, bisect_by=Plane(origin=(47.861735161, -5.85289058, 4.370703776), z_dir=(0.4691152643707939, -0.8831369478933152, 0)), keep=Keep.TOP, mode=Mode.PRIVATE)
    fillet1_piece_10 = split(fillet1_piece_10, bisect_by=Plane(origin=(48.501873721, -7.337653121, 4.370703776), z_dir=(-0.3251866210132924, 0.9456498620070525, 0)), keep=Keep.TOP, mode=Mode.PRIVATE)
    add(fillet1_piece_10, mode=Mode.SUBTRACT)
    with BuildSketch(Plane(origin=(48.308505546, -10.583880466, -4.55), x_dir=(-1, 0, 0), z_dir=(0, 1, 0))) as fillet1_piece_11_section:
        with BuildLine():
            CenterArc((FILLET1_R, FILLET1_R), FILLET1_R, 180, 90)
            Line((0, FILLET1_R), (-FILLET1_R * 0.02, FILLET1_R))
            Line((-FILLET1_R * 0.02, FILLET1_R), (-FILLET1_R * 0.02, -FILLET1_R * 0.02))
            Line((-FILLET1_R * 0.02, -FILLET1_R * 0.02), (FILLET1_R, -FILLET1_R * 0.02))
            Line((FILLET1_R, -FILLET1_R * 0.02), (FILLET1_R, 0))
        make_face()
    fillet1_piece_11 = extrude(amount=5.679732603, mode=Mode.PRIVATE)
    fillet1_piece_11 = split(fillet1_piece_11, bisect_by=Plane(origin=(47.610056609, -7.644327933, -4.320561018), z_dir=(0.3251866210132924, -0.9456498620070525, 0)), keep=Keep.TOP, mode=Mode.PRIVATE)
    add(fillet1_piece_11, mode=Mode.SUBTRACT)
    with BuildSketch(Plane(origin=(48.308505546, -10.583880466, 4.55), x_dir=(-1, 0, 0), z_dir=(0, 1, 0))) as fillet1_piece_12_section:
        with BuildLine():
            CenterArc((FILLET1_R, -FILLET1_R), FILLET1_R, 90, 90)
            Line((0, -FILLET1_R), (-FILLET1_R * 0.02, -FILLET1_R))
            Line((-FILLET1_R * 0.02, -FILLET1_R), (-FILLET1_R * 0.02, FILLET1_R * 0.02))
            Line((-FILLET1_R * 0.02, FILLET1_R * 0.02), (FILLET1_R, FILLET1_R * 0.02))
            Line((FILLET1_R, FILLET1_R * 0.02), (FILLET1_R, 0))
        make_face()
    fillet1_piece_12 = extrude(amount=5.679732603, mode=Mode.PRIVATE)
    fillet1_piece_12 = split(fillet1_piece_12, bisect_by=Plane(origin=(47.610056609, -7.644327933, 4.320561018), z_dir=(0.3251866210132924, -0.9456498620070525, 0)), keep=Keep.TOP, mode=Mode.PRIVATE)
    add(fillet1_piece_12, mode=Mode.SUBTRACT)

    # Sketch16 → Boss-Extrude14 (add)
    with BuildSketch(Plane.XZ.offset(10.583880466)):
        with Locations(Location((43.685139295, 0, 0), (0, 0, 270))):
            Circle(SKETCH16_R)
    extrude(amount=BOSS_EXTRUDE14_DEPTH)

    # Sketch17 → Boss-Extrude15 (add)
    with BuildSketch(Plane.XZ.offset(11.583880466)):
        with Locations(Location((43.685139295, 0, 0), (0, 0, 270))):
            Circle(SKETCH17_R)
    extrude(amount=BOSS_EXTRUDE15_DEPTH)

    # Sketch18 → Boss-Extrude16 (add)
    with BuildSketch(Plane.XZ.offset(20.083880466)):
        with Locations(Location((43.685139295, 0, 0), (0, 0, 270))):
            Circle(SKETCH18_R)
    extrude(amount=BOSS_EXTRUDE16_DEPTH)

    # Sketch19 → Boss-Extrude17 (add)
    with BuildSketch(Plane.XZ.offset(21.583880466)):
        with Locations(Location((43.685139295, 0, 0), (0, 0, 270))):
            Circle(SKETCH19_R)
    extrude(amount=BOSS_EXTRUDE17_DEPTH)

    # Sketch21 → Boss-Extrude18 (add)
    with BuildSketch(Plane.XZ.offset(21.833880466)):
        with Locations(Location((43.685139295, 0, 0), (0, 0, 270))):
            Circle(SKETCH21_R)
    extrude(amount=BOSS_EXTRUDE18_DEPTH)

    # Sketch22 → Boss-Extrude19 (add)
    with BuildSketch(Plane.XZ.offset(27.833880466)):
        with Locations(Location((43.685139295, 0, 0), (0, 0, 270))):
            Circle(SKETCH22_R)
    extrude(amount=BOSS_EXTRUDE19_DEPTH)

    # Chamfer3
    chamfer3_edges = [part.edges().sort_by_distance(p)[0] for p in [
        (43.685139295, -28.833880466, 3.5),
    ]]
    chamfer(chamfer3_edges, length=CHAMFER3_SIZE)

    # Fillet2
    fillet2_edges = [part.edges().sort_by_distance(p)[0] for p in [
        (43.685139295, -20.083880466, 3.75),
    ]]
    fillet(fillet2_edges, radius=FILLET2_R)

    # Sketch23 → Boss-Extrude20 (add)
    with BuildSketch(Plane(origin=(0, 6.403022561, 0), x_dir=(1, 0, 0), z_dir=(0, 1, 0))):
        Polygon((27, -6.675612488), (33.183446243, -6.675612488), (34, -5.875612488), (34, -4.28552155), (34, 4.28552155), (34, 5.875612488), (33.183446243, 6.675612488), (27, 6.675612488), align=None)
    extrude(amount=BOSS_EXTRUDE20_DEPTH)

    # Draft8
    draft8_faces = [part.faces().sort_by_distance(p)[0] for p in [
        (30.477279885, 7.403022561, 0),
    ]]
    draft(draft8_faces, Plane(origin=(34, 7.403022561, -4.28552155), x_dir=(0, 0, 1), z_dir=(1, 0, 0)), DRAFT8_ANGLE)

    # Fillet3
    fillet3_edges = [part.edges().sort_by_distance(p)[0] for p in [
        (27, 0, 4.643543905),
    ]]
    fillet(fillet3_edges, radius=FILLET3_R)

    # Fillet4
    fillet4_edges = [part.edges().sort_by_distance(p)[0] for p in [
        (43.685139295, -20.083880466, 5.25),
        (43.685139295, -21.583880466, 5.25),
    ]]
    fillet(fillet4_edges, radius=FILLET4_R - 0.0001)  # a hair under: the kernel refuses the full size


solid = part.part
